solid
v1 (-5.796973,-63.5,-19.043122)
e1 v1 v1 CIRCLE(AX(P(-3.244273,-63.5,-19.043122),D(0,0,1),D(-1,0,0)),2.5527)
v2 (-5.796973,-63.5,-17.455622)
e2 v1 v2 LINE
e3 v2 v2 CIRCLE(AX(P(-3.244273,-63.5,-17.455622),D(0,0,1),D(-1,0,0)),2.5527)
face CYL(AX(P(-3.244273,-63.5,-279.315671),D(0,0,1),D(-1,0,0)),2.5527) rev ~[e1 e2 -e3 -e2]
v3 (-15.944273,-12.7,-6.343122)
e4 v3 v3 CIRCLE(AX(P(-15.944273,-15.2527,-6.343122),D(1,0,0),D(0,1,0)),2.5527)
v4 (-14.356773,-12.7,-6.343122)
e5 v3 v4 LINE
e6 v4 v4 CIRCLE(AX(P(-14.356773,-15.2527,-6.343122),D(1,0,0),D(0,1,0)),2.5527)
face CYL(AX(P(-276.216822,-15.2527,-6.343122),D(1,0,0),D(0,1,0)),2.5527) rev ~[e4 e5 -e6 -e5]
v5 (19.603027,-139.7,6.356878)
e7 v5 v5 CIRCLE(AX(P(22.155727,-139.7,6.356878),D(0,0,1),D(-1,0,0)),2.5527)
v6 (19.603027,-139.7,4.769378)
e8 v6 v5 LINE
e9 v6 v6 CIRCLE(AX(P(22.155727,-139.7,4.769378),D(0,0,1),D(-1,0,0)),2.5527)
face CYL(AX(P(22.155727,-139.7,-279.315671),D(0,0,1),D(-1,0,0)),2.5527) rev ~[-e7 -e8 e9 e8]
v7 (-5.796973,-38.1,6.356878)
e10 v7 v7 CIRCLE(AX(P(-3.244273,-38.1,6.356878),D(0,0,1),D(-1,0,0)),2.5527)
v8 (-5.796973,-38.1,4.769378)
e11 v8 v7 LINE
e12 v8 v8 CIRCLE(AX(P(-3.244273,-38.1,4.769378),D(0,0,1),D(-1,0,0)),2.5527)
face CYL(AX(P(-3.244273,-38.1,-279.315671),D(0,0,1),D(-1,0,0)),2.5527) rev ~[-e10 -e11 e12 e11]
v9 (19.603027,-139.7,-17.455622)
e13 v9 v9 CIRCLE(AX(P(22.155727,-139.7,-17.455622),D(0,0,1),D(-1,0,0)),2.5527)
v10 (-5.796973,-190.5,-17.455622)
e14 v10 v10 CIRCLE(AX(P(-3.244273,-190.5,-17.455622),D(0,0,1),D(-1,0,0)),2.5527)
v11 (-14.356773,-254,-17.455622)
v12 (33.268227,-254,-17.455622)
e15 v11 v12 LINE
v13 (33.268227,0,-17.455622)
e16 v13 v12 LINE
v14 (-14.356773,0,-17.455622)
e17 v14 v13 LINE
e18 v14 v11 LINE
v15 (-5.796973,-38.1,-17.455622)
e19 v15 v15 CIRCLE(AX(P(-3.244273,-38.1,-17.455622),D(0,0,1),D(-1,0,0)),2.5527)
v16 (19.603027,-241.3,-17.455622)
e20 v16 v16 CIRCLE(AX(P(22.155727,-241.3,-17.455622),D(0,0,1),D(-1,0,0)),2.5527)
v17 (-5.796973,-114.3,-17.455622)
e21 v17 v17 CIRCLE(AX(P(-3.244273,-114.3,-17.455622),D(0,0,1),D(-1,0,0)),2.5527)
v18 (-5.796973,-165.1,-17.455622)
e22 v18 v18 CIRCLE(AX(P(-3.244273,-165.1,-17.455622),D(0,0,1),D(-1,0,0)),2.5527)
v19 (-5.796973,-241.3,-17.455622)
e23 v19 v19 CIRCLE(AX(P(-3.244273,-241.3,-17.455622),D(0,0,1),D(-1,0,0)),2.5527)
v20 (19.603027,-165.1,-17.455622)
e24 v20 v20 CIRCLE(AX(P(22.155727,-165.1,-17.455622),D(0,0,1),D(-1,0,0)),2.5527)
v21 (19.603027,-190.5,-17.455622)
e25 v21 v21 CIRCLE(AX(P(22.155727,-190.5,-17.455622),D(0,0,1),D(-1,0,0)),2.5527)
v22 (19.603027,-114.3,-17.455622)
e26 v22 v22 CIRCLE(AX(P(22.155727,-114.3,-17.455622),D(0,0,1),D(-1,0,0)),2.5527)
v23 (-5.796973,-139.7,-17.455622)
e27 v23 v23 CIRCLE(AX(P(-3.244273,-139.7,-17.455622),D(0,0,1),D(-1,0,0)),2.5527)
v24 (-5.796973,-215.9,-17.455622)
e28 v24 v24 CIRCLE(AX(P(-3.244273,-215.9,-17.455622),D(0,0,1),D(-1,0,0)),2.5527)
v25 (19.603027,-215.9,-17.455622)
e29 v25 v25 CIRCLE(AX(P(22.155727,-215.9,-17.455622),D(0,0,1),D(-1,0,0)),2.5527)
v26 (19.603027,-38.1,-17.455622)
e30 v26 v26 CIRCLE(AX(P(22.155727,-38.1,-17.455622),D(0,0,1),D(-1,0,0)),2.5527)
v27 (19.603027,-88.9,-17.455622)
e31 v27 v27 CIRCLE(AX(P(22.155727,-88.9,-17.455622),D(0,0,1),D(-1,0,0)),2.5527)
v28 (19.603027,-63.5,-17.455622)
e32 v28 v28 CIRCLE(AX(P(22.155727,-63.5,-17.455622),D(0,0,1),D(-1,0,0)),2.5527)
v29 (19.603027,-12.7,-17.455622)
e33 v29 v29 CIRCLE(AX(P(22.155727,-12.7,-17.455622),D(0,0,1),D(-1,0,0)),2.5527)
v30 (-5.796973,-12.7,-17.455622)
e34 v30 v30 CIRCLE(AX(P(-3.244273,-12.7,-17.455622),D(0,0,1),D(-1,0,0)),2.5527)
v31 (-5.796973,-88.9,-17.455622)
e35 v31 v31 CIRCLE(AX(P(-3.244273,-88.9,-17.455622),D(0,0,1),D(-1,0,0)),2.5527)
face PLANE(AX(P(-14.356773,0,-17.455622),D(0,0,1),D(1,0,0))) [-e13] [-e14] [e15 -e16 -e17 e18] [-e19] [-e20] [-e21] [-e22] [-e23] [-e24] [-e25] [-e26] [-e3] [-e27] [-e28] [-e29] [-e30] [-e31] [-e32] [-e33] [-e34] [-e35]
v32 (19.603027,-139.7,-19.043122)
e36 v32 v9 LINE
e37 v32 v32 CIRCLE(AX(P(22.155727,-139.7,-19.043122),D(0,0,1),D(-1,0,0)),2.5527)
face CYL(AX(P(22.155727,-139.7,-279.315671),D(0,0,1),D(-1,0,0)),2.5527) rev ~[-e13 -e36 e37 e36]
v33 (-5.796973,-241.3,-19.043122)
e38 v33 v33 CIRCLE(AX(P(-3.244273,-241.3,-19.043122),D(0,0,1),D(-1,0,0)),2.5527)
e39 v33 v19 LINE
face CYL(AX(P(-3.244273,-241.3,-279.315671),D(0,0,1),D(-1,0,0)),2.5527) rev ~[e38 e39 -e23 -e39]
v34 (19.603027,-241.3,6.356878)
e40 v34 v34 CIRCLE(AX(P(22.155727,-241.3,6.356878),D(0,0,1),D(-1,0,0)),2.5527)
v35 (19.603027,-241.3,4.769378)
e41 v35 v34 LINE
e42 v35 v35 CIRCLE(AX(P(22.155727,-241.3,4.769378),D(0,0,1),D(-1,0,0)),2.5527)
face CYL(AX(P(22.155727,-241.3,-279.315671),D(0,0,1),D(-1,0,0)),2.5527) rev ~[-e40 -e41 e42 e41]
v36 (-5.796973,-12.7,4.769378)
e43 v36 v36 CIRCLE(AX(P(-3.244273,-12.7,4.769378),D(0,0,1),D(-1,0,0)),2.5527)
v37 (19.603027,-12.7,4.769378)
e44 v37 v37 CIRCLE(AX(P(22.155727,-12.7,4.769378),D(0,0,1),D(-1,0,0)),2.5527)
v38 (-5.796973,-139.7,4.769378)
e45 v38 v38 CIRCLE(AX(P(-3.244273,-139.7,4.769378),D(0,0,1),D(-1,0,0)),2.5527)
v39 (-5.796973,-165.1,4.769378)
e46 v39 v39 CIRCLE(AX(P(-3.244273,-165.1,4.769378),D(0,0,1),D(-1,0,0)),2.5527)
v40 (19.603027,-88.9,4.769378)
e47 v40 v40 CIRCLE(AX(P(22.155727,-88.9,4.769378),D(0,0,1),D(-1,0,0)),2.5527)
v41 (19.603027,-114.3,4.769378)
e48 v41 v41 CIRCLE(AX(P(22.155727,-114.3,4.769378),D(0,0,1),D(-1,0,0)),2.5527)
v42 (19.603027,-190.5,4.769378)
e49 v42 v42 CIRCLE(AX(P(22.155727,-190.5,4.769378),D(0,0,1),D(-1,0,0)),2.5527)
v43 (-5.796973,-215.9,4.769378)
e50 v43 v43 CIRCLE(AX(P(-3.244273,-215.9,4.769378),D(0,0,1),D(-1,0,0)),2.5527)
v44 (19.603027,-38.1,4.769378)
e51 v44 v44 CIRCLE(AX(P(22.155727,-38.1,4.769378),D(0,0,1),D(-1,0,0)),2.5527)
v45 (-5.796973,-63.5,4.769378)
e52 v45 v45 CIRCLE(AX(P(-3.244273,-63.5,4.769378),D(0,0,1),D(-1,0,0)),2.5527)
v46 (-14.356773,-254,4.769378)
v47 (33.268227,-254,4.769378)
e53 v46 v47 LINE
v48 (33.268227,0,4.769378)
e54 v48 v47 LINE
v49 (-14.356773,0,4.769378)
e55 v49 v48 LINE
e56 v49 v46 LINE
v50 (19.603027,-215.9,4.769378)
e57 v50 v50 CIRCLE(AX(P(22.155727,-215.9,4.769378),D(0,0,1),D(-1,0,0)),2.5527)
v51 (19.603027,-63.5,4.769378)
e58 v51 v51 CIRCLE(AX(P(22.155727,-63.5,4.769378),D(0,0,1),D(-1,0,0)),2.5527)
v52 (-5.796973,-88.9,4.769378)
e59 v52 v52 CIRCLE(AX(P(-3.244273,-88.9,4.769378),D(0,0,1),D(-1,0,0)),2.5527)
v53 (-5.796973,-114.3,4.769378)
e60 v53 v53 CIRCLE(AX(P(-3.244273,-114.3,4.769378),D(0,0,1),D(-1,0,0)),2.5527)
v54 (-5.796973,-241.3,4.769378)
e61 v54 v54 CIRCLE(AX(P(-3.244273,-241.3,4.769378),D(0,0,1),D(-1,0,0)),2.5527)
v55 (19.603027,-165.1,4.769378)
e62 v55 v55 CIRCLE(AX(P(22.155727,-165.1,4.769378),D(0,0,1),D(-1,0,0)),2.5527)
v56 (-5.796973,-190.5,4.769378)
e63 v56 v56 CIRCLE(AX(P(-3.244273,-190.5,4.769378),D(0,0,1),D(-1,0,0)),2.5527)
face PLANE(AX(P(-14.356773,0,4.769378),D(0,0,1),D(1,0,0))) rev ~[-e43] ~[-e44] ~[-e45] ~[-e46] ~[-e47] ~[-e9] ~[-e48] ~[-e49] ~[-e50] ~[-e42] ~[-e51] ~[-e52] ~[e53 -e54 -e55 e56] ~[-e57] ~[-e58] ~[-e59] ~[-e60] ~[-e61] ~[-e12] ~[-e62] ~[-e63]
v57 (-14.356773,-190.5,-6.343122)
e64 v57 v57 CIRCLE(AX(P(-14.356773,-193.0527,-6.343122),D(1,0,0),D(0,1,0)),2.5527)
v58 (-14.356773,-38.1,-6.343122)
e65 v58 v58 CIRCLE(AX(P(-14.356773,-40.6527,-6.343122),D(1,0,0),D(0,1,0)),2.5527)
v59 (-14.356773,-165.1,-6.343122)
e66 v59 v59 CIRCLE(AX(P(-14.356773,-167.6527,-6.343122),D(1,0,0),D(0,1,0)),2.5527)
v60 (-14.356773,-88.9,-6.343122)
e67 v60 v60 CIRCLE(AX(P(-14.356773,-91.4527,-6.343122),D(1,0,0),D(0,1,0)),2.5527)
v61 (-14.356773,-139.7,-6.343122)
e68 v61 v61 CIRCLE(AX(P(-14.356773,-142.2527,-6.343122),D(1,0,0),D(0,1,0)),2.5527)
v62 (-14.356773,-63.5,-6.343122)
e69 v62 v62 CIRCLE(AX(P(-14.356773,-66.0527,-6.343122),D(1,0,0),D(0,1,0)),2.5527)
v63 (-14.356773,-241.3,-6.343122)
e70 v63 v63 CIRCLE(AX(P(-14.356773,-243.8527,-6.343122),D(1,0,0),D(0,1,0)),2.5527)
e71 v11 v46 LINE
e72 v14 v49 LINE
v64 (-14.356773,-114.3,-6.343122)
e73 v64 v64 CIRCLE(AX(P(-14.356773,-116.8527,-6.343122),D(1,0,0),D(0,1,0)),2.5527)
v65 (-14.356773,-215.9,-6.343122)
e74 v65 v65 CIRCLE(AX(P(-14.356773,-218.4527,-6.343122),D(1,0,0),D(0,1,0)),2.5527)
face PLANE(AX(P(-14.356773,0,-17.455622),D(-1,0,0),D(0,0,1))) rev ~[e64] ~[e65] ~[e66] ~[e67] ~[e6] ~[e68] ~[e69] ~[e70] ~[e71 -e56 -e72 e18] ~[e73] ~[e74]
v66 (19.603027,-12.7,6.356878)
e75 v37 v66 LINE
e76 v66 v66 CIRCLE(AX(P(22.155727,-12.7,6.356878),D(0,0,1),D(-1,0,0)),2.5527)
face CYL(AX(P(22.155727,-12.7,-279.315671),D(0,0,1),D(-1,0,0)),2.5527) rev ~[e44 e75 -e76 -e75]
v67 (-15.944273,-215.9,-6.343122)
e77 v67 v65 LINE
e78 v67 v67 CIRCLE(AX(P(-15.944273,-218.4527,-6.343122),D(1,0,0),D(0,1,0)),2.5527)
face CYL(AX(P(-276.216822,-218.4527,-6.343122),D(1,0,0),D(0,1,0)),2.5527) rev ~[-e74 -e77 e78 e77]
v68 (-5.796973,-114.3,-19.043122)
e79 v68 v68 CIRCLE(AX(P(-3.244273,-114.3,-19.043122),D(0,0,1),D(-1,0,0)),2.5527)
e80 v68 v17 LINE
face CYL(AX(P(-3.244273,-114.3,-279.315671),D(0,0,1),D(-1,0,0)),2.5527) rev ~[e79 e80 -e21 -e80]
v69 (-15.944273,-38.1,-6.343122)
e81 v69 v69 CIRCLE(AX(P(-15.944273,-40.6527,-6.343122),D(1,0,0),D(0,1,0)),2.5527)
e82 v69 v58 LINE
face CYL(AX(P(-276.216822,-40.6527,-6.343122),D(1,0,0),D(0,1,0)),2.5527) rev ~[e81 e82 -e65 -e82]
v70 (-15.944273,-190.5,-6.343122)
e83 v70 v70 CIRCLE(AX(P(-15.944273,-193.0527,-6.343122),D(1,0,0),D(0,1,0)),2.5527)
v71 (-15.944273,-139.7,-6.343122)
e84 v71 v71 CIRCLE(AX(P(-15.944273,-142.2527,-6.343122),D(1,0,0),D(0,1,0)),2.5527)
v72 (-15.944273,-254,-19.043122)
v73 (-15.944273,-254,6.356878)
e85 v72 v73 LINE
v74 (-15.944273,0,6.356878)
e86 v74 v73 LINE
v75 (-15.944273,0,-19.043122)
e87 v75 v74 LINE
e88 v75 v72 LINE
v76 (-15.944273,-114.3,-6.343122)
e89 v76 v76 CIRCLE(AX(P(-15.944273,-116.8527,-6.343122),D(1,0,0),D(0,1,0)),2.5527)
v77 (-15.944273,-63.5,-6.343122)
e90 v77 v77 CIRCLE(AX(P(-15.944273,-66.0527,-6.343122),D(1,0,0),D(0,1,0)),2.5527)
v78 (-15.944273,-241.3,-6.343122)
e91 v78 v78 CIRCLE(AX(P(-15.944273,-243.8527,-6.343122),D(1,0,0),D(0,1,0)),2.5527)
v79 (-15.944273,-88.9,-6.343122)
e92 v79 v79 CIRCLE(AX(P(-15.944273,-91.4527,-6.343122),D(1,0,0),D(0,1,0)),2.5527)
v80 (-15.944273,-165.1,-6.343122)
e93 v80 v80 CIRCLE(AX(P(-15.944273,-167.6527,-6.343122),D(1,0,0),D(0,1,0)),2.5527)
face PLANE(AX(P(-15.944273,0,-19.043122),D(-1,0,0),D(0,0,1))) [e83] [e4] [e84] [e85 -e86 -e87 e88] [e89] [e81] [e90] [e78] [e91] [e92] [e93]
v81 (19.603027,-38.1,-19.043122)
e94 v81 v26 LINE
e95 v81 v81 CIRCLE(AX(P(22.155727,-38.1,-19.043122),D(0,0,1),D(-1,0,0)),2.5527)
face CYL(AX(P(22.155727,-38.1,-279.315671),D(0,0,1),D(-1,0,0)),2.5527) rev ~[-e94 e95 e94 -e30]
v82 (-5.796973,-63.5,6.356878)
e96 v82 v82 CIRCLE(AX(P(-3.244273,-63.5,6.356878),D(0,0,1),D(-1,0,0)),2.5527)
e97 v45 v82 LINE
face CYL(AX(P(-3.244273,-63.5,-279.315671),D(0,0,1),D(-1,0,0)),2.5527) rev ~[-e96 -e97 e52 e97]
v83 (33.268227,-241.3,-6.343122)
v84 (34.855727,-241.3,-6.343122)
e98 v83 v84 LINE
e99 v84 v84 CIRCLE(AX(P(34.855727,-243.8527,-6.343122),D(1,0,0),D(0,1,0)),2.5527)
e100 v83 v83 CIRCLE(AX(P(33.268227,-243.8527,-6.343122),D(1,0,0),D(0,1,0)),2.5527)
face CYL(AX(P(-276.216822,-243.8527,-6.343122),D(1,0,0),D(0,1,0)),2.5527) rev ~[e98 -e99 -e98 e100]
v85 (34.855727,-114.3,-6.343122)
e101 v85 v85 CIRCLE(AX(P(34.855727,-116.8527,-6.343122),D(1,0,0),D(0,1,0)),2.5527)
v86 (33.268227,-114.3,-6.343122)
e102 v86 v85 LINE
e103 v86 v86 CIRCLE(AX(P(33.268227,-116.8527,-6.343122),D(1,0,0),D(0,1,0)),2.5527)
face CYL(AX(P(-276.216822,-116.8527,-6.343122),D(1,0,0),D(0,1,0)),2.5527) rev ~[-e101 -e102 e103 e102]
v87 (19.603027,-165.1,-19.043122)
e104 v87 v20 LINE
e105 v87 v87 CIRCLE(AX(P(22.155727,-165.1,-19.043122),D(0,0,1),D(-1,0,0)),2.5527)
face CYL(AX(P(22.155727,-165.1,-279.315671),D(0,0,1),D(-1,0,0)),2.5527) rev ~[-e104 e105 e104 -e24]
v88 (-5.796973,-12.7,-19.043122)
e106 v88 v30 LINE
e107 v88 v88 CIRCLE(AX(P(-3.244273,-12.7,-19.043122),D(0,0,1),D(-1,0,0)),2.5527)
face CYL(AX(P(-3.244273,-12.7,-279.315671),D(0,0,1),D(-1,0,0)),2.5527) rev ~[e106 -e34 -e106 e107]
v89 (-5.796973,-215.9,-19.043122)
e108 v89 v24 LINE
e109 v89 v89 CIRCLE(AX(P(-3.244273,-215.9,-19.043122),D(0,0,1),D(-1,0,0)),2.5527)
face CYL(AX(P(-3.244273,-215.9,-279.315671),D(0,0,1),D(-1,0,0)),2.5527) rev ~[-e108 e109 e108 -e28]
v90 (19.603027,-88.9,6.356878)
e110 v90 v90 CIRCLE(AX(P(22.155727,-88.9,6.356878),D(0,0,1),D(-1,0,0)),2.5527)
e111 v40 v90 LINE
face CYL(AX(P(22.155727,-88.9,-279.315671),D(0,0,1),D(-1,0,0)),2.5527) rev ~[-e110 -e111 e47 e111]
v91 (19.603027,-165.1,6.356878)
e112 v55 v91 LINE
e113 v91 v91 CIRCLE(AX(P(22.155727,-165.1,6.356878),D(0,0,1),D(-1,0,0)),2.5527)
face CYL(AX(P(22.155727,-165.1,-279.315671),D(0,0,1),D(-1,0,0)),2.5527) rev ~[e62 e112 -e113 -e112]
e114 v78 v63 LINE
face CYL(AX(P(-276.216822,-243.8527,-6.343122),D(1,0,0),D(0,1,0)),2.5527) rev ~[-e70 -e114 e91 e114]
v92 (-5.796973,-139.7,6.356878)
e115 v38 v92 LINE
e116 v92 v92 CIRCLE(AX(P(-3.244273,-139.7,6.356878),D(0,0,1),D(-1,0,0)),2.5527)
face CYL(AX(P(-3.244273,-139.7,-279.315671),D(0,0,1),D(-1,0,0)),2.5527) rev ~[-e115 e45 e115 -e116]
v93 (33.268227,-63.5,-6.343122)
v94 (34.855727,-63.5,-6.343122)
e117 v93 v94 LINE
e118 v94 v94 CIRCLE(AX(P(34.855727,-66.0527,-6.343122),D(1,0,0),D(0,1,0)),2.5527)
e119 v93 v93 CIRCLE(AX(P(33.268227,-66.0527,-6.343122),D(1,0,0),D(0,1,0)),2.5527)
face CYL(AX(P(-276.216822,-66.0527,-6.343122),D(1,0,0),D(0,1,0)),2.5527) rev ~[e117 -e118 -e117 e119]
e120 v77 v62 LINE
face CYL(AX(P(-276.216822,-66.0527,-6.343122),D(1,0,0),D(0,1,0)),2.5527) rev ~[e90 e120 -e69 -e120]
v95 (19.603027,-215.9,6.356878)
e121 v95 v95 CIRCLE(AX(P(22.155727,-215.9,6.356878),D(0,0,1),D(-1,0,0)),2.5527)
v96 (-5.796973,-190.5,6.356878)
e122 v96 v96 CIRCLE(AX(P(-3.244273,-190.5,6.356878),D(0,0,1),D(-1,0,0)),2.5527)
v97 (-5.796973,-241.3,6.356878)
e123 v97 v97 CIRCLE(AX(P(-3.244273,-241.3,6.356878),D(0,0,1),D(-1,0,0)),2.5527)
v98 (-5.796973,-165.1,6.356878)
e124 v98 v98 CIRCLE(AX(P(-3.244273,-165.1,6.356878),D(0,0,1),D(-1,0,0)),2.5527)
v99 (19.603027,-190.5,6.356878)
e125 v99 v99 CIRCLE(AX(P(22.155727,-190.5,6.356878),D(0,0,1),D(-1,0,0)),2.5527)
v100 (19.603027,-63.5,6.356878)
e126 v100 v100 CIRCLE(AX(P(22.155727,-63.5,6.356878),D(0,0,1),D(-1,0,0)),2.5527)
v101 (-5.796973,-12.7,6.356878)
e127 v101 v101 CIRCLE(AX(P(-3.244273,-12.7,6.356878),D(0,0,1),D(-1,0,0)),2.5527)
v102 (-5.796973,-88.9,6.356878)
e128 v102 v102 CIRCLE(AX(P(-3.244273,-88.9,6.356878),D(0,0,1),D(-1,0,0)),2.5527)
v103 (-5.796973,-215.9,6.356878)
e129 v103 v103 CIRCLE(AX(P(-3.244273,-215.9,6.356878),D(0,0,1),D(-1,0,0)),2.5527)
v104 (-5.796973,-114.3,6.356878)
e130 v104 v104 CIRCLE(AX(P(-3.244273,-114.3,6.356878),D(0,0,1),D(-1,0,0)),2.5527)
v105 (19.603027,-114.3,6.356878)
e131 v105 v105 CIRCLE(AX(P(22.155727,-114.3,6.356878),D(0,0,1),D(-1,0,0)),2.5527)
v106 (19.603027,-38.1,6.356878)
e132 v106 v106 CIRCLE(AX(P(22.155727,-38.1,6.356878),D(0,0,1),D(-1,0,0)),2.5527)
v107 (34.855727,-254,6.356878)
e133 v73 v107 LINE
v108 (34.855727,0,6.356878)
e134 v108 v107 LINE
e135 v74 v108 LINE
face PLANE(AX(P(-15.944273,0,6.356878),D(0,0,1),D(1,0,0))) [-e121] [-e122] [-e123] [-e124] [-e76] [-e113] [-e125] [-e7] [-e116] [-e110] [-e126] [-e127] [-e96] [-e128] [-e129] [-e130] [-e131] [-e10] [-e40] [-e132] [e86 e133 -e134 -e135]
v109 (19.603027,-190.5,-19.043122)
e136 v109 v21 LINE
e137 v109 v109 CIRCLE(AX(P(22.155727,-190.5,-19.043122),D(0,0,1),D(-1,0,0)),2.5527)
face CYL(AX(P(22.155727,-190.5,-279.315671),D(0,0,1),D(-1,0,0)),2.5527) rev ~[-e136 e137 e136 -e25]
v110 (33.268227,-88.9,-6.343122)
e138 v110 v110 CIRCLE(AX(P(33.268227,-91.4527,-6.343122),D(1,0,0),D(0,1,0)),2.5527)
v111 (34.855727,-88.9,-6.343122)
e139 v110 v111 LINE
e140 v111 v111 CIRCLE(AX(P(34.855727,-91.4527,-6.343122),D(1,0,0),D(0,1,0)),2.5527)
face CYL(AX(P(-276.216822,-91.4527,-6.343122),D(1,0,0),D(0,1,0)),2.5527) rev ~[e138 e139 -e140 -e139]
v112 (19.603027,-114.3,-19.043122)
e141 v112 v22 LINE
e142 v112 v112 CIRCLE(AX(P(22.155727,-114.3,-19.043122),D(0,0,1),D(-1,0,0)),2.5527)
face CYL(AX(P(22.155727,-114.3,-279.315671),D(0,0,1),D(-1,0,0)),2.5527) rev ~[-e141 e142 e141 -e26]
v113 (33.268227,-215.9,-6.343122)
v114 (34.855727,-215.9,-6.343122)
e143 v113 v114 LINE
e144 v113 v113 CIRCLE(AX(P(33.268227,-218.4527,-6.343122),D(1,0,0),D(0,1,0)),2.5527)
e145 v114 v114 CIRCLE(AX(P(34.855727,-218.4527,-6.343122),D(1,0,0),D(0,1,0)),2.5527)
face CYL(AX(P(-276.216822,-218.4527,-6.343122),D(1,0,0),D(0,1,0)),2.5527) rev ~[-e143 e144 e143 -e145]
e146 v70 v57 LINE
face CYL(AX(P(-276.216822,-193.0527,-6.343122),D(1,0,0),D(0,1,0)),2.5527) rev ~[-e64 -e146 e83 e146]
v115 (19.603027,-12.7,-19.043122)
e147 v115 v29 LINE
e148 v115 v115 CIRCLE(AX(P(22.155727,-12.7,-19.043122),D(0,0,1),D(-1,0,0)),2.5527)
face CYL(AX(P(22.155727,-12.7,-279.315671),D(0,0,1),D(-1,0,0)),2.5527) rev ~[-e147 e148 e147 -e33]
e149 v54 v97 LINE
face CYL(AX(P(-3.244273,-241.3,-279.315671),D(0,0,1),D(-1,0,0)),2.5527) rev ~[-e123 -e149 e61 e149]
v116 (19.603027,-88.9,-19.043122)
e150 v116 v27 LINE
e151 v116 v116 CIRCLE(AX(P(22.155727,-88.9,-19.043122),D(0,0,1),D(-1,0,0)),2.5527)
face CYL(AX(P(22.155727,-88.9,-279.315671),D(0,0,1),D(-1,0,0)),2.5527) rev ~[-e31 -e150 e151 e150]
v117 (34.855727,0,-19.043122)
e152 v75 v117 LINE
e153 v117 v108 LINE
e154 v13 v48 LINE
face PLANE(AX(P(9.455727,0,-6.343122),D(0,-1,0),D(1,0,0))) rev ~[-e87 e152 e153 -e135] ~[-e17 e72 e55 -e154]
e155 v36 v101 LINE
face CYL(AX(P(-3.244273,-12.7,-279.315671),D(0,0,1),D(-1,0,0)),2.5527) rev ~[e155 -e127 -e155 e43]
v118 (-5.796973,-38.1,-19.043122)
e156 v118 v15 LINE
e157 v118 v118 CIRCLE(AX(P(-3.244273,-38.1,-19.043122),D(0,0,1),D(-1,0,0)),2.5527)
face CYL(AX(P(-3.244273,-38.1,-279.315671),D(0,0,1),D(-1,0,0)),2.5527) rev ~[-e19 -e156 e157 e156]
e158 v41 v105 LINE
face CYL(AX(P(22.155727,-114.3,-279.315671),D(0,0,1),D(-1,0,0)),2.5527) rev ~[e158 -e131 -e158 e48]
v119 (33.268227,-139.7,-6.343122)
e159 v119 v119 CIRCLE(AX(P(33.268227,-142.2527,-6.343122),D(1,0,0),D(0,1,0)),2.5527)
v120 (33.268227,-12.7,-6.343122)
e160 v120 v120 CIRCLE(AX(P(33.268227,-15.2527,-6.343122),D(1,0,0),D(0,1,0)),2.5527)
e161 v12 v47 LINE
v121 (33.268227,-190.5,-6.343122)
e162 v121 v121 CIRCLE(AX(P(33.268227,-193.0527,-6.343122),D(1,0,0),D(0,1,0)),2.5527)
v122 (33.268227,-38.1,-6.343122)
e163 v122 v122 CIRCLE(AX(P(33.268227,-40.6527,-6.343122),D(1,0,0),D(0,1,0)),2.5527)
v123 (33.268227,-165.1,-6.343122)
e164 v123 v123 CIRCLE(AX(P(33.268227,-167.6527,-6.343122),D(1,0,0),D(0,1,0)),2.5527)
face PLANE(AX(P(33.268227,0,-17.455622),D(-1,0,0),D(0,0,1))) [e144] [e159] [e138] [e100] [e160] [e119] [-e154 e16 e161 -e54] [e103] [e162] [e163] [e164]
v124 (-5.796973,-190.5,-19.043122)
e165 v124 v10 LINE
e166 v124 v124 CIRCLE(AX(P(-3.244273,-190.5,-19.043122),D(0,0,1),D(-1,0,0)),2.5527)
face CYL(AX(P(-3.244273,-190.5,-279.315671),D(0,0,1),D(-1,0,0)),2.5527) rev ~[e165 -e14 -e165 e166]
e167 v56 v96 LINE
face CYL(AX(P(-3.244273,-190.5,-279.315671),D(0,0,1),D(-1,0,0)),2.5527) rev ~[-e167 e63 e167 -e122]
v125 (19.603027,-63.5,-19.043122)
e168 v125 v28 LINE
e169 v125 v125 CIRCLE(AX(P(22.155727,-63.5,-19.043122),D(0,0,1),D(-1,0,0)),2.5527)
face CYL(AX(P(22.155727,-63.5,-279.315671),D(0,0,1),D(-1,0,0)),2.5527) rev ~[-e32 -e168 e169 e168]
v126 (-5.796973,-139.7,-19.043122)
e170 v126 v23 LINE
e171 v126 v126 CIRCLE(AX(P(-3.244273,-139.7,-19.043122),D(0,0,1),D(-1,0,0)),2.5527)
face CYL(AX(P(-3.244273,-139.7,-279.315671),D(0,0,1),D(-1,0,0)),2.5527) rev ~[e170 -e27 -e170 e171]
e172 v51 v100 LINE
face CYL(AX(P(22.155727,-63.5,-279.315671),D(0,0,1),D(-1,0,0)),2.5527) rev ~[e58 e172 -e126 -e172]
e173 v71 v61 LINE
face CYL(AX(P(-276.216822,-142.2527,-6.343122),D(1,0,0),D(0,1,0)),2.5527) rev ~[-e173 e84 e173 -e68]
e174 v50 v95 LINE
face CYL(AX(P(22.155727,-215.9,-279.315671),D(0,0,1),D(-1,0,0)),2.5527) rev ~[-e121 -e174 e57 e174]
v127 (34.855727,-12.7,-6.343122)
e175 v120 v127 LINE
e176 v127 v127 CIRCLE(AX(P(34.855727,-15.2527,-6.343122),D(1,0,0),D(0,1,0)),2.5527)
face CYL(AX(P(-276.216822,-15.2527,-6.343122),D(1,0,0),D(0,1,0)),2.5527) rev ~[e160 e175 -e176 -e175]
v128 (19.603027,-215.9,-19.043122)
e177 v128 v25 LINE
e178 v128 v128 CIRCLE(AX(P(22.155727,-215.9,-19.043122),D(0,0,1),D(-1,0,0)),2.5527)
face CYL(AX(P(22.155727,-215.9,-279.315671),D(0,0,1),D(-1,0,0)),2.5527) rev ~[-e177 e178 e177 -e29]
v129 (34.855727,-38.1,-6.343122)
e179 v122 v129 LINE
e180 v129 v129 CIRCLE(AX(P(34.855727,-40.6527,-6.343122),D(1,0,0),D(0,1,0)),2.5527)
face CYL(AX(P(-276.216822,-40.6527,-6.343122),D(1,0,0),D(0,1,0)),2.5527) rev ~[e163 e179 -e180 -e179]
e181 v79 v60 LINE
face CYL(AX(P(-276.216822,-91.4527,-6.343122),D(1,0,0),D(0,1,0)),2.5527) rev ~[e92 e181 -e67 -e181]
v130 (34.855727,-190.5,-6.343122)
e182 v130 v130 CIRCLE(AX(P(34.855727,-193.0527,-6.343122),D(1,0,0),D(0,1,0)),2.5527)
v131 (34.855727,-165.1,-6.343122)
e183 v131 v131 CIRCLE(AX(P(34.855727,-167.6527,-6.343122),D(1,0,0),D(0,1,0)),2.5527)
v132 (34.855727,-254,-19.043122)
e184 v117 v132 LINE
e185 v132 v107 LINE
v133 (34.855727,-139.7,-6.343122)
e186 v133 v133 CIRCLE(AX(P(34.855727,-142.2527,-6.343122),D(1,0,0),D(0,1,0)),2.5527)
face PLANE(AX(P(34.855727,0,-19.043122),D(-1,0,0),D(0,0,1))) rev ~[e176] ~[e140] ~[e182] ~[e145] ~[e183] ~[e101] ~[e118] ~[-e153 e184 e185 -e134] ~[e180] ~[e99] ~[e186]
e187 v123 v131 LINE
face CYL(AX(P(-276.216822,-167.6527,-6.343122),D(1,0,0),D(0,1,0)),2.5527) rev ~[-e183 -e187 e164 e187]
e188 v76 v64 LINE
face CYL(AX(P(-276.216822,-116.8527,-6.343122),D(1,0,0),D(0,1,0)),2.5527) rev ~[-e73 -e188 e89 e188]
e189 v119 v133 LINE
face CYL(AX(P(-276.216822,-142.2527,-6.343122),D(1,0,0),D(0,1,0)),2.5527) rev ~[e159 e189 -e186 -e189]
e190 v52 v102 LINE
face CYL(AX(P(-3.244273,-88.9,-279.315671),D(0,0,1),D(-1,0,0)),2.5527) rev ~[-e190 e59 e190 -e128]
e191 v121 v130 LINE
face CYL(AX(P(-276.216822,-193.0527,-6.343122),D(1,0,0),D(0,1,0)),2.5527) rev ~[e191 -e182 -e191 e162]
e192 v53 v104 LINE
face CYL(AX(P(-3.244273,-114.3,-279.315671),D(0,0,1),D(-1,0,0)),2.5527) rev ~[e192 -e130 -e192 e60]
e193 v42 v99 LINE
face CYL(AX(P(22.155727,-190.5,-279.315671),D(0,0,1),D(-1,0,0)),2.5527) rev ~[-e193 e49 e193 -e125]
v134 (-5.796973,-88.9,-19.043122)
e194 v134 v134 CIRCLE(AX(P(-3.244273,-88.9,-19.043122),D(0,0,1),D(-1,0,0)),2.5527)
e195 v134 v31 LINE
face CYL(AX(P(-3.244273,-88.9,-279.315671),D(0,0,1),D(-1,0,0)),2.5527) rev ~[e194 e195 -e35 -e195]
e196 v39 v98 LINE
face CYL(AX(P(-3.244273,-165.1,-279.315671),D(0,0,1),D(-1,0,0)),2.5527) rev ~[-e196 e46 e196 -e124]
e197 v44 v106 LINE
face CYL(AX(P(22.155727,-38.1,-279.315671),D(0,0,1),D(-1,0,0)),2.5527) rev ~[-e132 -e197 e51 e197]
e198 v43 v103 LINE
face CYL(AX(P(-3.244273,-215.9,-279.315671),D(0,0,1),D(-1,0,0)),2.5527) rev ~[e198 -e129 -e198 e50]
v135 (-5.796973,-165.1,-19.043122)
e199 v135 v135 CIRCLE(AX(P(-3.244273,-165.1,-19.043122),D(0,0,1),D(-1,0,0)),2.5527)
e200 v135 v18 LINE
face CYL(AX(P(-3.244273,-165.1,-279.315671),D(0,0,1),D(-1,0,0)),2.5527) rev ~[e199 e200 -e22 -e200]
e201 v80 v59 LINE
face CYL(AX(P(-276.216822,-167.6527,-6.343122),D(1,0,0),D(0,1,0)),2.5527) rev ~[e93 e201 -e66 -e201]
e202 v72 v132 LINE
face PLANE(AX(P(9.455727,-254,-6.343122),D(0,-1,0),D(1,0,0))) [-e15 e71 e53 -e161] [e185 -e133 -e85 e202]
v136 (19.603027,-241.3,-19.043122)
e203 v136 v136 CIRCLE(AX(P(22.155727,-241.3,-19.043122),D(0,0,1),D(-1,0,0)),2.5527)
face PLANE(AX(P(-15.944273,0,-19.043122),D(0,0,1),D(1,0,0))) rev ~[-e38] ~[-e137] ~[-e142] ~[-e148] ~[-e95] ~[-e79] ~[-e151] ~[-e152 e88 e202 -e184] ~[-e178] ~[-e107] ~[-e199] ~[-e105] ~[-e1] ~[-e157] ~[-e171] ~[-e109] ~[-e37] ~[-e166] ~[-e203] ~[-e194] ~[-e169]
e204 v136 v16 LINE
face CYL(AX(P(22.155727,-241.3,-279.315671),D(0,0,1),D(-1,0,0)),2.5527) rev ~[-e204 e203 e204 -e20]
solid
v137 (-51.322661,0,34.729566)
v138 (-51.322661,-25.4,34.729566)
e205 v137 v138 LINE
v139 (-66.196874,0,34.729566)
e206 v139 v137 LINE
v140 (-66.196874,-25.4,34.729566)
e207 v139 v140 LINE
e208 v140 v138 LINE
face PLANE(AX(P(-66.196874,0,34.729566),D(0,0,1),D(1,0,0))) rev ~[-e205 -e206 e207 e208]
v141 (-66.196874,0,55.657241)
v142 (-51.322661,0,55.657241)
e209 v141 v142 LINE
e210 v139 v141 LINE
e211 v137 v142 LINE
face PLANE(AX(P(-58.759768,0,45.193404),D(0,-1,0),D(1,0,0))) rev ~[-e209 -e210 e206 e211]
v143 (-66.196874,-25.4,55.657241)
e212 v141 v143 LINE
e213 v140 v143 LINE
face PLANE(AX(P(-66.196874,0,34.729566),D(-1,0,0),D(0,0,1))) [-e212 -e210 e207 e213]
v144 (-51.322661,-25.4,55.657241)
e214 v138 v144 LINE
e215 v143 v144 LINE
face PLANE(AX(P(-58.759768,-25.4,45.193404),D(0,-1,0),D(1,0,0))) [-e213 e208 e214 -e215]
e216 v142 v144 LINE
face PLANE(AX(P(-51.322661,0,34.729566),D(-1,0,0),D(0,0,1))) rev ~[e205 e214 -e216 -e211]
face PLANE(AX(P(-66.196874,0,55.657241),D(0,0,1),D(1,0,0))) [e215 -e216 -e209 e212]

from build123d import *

# Parameters (mm, degrees)
F0_W     = 50.8
F0_H     = 25.4
F0_W_2   = 47.625
F0_H_2   = 22.225
F1_DEPTH = 254
F3_D     = 5.1054
F5_D     = 5.1054
F6_W     = 14.8742124438
F6_H     = 20.9276750684
F7_DEPTH = 25.4


# Not quite as in the source:
# - a feature names something its author has since deleted; it is built from what else it names


with BuildPart() as f1:
    # F0 (on Front) → F1 (new body)
    with BuildSketch(Plane.XZ):
        with Locations((9.4557274133, -6.3431215849)):
            Rectangle(F0_W, F0_H)
        with Locations((9.4557274133, -6.3431215849)):
            Rectangle(F0_W_2, F0_H_2, mode=Mode.SUBTRACT)
    extrude(amount=F1_DEPTH)

    # F3 (through all)
    with Locations(Plane(origin=(-15.9442725867, 0, 0), x_dir=(0, -1, 0), z_dir=(-1, 0, 0))):
        with Locations((40.6527, -6.3431215849), (66.0527, -6.3431215849), (91.4527, -6.3431215849), (116.8527, -6.3431215849), (15.2527, -6.3431215849), (142.2527, -6.3431215849), (167.6527, -6.3431215849), (193.0527, -6.3431215849), (218.4527, -6.3431215849), (243.8527, -6.3431215849)):
            Hole(F3_D / 2)

    # F5 (through all)
    with Locations(Plane(origin=(0, 0, -19.0431215849), x_dir=(1, 0, 0), z_dir=(0, 0, -1))):
        with Locations((-3.2442725867, 12.7), (22.1557274133, 12.7), (22.1557274133, 38.1), (-3.2442725867, 38.1), (22.1557274133, 63.5), (-3.2442725867, 63.5), (22.1557274133, 88.9), (-3.2442725867, 88.9), (22.1557274133, 114.3), (-3.2442725867, 114.3), (22.1557274133, 139.7), (-3.2442725867, 139.7), (22.1557274133, 165.1), (-3.2442725867, 165.1), (22.1557274133, 190.5), (-3.2442725867, 190.5), (22.1557274133, 215.9), (-3.2442725867, 215.9), (22.1557274133, 241.3), (-3.2442725867, 241.3)):
            Hole(F5_D / 2)


with BuildPart() as f7:
    # F6 (on Front) → F7 (new body)
    with BuildSketch(Plane.XZ):
        with Locations((-58.7597675622, 45.1934039593)):
            Rectangle(F6_W, F6_H)
    extrude(amount=F7_DEPTH)


solid = Compound([f1.part, f7.part])
